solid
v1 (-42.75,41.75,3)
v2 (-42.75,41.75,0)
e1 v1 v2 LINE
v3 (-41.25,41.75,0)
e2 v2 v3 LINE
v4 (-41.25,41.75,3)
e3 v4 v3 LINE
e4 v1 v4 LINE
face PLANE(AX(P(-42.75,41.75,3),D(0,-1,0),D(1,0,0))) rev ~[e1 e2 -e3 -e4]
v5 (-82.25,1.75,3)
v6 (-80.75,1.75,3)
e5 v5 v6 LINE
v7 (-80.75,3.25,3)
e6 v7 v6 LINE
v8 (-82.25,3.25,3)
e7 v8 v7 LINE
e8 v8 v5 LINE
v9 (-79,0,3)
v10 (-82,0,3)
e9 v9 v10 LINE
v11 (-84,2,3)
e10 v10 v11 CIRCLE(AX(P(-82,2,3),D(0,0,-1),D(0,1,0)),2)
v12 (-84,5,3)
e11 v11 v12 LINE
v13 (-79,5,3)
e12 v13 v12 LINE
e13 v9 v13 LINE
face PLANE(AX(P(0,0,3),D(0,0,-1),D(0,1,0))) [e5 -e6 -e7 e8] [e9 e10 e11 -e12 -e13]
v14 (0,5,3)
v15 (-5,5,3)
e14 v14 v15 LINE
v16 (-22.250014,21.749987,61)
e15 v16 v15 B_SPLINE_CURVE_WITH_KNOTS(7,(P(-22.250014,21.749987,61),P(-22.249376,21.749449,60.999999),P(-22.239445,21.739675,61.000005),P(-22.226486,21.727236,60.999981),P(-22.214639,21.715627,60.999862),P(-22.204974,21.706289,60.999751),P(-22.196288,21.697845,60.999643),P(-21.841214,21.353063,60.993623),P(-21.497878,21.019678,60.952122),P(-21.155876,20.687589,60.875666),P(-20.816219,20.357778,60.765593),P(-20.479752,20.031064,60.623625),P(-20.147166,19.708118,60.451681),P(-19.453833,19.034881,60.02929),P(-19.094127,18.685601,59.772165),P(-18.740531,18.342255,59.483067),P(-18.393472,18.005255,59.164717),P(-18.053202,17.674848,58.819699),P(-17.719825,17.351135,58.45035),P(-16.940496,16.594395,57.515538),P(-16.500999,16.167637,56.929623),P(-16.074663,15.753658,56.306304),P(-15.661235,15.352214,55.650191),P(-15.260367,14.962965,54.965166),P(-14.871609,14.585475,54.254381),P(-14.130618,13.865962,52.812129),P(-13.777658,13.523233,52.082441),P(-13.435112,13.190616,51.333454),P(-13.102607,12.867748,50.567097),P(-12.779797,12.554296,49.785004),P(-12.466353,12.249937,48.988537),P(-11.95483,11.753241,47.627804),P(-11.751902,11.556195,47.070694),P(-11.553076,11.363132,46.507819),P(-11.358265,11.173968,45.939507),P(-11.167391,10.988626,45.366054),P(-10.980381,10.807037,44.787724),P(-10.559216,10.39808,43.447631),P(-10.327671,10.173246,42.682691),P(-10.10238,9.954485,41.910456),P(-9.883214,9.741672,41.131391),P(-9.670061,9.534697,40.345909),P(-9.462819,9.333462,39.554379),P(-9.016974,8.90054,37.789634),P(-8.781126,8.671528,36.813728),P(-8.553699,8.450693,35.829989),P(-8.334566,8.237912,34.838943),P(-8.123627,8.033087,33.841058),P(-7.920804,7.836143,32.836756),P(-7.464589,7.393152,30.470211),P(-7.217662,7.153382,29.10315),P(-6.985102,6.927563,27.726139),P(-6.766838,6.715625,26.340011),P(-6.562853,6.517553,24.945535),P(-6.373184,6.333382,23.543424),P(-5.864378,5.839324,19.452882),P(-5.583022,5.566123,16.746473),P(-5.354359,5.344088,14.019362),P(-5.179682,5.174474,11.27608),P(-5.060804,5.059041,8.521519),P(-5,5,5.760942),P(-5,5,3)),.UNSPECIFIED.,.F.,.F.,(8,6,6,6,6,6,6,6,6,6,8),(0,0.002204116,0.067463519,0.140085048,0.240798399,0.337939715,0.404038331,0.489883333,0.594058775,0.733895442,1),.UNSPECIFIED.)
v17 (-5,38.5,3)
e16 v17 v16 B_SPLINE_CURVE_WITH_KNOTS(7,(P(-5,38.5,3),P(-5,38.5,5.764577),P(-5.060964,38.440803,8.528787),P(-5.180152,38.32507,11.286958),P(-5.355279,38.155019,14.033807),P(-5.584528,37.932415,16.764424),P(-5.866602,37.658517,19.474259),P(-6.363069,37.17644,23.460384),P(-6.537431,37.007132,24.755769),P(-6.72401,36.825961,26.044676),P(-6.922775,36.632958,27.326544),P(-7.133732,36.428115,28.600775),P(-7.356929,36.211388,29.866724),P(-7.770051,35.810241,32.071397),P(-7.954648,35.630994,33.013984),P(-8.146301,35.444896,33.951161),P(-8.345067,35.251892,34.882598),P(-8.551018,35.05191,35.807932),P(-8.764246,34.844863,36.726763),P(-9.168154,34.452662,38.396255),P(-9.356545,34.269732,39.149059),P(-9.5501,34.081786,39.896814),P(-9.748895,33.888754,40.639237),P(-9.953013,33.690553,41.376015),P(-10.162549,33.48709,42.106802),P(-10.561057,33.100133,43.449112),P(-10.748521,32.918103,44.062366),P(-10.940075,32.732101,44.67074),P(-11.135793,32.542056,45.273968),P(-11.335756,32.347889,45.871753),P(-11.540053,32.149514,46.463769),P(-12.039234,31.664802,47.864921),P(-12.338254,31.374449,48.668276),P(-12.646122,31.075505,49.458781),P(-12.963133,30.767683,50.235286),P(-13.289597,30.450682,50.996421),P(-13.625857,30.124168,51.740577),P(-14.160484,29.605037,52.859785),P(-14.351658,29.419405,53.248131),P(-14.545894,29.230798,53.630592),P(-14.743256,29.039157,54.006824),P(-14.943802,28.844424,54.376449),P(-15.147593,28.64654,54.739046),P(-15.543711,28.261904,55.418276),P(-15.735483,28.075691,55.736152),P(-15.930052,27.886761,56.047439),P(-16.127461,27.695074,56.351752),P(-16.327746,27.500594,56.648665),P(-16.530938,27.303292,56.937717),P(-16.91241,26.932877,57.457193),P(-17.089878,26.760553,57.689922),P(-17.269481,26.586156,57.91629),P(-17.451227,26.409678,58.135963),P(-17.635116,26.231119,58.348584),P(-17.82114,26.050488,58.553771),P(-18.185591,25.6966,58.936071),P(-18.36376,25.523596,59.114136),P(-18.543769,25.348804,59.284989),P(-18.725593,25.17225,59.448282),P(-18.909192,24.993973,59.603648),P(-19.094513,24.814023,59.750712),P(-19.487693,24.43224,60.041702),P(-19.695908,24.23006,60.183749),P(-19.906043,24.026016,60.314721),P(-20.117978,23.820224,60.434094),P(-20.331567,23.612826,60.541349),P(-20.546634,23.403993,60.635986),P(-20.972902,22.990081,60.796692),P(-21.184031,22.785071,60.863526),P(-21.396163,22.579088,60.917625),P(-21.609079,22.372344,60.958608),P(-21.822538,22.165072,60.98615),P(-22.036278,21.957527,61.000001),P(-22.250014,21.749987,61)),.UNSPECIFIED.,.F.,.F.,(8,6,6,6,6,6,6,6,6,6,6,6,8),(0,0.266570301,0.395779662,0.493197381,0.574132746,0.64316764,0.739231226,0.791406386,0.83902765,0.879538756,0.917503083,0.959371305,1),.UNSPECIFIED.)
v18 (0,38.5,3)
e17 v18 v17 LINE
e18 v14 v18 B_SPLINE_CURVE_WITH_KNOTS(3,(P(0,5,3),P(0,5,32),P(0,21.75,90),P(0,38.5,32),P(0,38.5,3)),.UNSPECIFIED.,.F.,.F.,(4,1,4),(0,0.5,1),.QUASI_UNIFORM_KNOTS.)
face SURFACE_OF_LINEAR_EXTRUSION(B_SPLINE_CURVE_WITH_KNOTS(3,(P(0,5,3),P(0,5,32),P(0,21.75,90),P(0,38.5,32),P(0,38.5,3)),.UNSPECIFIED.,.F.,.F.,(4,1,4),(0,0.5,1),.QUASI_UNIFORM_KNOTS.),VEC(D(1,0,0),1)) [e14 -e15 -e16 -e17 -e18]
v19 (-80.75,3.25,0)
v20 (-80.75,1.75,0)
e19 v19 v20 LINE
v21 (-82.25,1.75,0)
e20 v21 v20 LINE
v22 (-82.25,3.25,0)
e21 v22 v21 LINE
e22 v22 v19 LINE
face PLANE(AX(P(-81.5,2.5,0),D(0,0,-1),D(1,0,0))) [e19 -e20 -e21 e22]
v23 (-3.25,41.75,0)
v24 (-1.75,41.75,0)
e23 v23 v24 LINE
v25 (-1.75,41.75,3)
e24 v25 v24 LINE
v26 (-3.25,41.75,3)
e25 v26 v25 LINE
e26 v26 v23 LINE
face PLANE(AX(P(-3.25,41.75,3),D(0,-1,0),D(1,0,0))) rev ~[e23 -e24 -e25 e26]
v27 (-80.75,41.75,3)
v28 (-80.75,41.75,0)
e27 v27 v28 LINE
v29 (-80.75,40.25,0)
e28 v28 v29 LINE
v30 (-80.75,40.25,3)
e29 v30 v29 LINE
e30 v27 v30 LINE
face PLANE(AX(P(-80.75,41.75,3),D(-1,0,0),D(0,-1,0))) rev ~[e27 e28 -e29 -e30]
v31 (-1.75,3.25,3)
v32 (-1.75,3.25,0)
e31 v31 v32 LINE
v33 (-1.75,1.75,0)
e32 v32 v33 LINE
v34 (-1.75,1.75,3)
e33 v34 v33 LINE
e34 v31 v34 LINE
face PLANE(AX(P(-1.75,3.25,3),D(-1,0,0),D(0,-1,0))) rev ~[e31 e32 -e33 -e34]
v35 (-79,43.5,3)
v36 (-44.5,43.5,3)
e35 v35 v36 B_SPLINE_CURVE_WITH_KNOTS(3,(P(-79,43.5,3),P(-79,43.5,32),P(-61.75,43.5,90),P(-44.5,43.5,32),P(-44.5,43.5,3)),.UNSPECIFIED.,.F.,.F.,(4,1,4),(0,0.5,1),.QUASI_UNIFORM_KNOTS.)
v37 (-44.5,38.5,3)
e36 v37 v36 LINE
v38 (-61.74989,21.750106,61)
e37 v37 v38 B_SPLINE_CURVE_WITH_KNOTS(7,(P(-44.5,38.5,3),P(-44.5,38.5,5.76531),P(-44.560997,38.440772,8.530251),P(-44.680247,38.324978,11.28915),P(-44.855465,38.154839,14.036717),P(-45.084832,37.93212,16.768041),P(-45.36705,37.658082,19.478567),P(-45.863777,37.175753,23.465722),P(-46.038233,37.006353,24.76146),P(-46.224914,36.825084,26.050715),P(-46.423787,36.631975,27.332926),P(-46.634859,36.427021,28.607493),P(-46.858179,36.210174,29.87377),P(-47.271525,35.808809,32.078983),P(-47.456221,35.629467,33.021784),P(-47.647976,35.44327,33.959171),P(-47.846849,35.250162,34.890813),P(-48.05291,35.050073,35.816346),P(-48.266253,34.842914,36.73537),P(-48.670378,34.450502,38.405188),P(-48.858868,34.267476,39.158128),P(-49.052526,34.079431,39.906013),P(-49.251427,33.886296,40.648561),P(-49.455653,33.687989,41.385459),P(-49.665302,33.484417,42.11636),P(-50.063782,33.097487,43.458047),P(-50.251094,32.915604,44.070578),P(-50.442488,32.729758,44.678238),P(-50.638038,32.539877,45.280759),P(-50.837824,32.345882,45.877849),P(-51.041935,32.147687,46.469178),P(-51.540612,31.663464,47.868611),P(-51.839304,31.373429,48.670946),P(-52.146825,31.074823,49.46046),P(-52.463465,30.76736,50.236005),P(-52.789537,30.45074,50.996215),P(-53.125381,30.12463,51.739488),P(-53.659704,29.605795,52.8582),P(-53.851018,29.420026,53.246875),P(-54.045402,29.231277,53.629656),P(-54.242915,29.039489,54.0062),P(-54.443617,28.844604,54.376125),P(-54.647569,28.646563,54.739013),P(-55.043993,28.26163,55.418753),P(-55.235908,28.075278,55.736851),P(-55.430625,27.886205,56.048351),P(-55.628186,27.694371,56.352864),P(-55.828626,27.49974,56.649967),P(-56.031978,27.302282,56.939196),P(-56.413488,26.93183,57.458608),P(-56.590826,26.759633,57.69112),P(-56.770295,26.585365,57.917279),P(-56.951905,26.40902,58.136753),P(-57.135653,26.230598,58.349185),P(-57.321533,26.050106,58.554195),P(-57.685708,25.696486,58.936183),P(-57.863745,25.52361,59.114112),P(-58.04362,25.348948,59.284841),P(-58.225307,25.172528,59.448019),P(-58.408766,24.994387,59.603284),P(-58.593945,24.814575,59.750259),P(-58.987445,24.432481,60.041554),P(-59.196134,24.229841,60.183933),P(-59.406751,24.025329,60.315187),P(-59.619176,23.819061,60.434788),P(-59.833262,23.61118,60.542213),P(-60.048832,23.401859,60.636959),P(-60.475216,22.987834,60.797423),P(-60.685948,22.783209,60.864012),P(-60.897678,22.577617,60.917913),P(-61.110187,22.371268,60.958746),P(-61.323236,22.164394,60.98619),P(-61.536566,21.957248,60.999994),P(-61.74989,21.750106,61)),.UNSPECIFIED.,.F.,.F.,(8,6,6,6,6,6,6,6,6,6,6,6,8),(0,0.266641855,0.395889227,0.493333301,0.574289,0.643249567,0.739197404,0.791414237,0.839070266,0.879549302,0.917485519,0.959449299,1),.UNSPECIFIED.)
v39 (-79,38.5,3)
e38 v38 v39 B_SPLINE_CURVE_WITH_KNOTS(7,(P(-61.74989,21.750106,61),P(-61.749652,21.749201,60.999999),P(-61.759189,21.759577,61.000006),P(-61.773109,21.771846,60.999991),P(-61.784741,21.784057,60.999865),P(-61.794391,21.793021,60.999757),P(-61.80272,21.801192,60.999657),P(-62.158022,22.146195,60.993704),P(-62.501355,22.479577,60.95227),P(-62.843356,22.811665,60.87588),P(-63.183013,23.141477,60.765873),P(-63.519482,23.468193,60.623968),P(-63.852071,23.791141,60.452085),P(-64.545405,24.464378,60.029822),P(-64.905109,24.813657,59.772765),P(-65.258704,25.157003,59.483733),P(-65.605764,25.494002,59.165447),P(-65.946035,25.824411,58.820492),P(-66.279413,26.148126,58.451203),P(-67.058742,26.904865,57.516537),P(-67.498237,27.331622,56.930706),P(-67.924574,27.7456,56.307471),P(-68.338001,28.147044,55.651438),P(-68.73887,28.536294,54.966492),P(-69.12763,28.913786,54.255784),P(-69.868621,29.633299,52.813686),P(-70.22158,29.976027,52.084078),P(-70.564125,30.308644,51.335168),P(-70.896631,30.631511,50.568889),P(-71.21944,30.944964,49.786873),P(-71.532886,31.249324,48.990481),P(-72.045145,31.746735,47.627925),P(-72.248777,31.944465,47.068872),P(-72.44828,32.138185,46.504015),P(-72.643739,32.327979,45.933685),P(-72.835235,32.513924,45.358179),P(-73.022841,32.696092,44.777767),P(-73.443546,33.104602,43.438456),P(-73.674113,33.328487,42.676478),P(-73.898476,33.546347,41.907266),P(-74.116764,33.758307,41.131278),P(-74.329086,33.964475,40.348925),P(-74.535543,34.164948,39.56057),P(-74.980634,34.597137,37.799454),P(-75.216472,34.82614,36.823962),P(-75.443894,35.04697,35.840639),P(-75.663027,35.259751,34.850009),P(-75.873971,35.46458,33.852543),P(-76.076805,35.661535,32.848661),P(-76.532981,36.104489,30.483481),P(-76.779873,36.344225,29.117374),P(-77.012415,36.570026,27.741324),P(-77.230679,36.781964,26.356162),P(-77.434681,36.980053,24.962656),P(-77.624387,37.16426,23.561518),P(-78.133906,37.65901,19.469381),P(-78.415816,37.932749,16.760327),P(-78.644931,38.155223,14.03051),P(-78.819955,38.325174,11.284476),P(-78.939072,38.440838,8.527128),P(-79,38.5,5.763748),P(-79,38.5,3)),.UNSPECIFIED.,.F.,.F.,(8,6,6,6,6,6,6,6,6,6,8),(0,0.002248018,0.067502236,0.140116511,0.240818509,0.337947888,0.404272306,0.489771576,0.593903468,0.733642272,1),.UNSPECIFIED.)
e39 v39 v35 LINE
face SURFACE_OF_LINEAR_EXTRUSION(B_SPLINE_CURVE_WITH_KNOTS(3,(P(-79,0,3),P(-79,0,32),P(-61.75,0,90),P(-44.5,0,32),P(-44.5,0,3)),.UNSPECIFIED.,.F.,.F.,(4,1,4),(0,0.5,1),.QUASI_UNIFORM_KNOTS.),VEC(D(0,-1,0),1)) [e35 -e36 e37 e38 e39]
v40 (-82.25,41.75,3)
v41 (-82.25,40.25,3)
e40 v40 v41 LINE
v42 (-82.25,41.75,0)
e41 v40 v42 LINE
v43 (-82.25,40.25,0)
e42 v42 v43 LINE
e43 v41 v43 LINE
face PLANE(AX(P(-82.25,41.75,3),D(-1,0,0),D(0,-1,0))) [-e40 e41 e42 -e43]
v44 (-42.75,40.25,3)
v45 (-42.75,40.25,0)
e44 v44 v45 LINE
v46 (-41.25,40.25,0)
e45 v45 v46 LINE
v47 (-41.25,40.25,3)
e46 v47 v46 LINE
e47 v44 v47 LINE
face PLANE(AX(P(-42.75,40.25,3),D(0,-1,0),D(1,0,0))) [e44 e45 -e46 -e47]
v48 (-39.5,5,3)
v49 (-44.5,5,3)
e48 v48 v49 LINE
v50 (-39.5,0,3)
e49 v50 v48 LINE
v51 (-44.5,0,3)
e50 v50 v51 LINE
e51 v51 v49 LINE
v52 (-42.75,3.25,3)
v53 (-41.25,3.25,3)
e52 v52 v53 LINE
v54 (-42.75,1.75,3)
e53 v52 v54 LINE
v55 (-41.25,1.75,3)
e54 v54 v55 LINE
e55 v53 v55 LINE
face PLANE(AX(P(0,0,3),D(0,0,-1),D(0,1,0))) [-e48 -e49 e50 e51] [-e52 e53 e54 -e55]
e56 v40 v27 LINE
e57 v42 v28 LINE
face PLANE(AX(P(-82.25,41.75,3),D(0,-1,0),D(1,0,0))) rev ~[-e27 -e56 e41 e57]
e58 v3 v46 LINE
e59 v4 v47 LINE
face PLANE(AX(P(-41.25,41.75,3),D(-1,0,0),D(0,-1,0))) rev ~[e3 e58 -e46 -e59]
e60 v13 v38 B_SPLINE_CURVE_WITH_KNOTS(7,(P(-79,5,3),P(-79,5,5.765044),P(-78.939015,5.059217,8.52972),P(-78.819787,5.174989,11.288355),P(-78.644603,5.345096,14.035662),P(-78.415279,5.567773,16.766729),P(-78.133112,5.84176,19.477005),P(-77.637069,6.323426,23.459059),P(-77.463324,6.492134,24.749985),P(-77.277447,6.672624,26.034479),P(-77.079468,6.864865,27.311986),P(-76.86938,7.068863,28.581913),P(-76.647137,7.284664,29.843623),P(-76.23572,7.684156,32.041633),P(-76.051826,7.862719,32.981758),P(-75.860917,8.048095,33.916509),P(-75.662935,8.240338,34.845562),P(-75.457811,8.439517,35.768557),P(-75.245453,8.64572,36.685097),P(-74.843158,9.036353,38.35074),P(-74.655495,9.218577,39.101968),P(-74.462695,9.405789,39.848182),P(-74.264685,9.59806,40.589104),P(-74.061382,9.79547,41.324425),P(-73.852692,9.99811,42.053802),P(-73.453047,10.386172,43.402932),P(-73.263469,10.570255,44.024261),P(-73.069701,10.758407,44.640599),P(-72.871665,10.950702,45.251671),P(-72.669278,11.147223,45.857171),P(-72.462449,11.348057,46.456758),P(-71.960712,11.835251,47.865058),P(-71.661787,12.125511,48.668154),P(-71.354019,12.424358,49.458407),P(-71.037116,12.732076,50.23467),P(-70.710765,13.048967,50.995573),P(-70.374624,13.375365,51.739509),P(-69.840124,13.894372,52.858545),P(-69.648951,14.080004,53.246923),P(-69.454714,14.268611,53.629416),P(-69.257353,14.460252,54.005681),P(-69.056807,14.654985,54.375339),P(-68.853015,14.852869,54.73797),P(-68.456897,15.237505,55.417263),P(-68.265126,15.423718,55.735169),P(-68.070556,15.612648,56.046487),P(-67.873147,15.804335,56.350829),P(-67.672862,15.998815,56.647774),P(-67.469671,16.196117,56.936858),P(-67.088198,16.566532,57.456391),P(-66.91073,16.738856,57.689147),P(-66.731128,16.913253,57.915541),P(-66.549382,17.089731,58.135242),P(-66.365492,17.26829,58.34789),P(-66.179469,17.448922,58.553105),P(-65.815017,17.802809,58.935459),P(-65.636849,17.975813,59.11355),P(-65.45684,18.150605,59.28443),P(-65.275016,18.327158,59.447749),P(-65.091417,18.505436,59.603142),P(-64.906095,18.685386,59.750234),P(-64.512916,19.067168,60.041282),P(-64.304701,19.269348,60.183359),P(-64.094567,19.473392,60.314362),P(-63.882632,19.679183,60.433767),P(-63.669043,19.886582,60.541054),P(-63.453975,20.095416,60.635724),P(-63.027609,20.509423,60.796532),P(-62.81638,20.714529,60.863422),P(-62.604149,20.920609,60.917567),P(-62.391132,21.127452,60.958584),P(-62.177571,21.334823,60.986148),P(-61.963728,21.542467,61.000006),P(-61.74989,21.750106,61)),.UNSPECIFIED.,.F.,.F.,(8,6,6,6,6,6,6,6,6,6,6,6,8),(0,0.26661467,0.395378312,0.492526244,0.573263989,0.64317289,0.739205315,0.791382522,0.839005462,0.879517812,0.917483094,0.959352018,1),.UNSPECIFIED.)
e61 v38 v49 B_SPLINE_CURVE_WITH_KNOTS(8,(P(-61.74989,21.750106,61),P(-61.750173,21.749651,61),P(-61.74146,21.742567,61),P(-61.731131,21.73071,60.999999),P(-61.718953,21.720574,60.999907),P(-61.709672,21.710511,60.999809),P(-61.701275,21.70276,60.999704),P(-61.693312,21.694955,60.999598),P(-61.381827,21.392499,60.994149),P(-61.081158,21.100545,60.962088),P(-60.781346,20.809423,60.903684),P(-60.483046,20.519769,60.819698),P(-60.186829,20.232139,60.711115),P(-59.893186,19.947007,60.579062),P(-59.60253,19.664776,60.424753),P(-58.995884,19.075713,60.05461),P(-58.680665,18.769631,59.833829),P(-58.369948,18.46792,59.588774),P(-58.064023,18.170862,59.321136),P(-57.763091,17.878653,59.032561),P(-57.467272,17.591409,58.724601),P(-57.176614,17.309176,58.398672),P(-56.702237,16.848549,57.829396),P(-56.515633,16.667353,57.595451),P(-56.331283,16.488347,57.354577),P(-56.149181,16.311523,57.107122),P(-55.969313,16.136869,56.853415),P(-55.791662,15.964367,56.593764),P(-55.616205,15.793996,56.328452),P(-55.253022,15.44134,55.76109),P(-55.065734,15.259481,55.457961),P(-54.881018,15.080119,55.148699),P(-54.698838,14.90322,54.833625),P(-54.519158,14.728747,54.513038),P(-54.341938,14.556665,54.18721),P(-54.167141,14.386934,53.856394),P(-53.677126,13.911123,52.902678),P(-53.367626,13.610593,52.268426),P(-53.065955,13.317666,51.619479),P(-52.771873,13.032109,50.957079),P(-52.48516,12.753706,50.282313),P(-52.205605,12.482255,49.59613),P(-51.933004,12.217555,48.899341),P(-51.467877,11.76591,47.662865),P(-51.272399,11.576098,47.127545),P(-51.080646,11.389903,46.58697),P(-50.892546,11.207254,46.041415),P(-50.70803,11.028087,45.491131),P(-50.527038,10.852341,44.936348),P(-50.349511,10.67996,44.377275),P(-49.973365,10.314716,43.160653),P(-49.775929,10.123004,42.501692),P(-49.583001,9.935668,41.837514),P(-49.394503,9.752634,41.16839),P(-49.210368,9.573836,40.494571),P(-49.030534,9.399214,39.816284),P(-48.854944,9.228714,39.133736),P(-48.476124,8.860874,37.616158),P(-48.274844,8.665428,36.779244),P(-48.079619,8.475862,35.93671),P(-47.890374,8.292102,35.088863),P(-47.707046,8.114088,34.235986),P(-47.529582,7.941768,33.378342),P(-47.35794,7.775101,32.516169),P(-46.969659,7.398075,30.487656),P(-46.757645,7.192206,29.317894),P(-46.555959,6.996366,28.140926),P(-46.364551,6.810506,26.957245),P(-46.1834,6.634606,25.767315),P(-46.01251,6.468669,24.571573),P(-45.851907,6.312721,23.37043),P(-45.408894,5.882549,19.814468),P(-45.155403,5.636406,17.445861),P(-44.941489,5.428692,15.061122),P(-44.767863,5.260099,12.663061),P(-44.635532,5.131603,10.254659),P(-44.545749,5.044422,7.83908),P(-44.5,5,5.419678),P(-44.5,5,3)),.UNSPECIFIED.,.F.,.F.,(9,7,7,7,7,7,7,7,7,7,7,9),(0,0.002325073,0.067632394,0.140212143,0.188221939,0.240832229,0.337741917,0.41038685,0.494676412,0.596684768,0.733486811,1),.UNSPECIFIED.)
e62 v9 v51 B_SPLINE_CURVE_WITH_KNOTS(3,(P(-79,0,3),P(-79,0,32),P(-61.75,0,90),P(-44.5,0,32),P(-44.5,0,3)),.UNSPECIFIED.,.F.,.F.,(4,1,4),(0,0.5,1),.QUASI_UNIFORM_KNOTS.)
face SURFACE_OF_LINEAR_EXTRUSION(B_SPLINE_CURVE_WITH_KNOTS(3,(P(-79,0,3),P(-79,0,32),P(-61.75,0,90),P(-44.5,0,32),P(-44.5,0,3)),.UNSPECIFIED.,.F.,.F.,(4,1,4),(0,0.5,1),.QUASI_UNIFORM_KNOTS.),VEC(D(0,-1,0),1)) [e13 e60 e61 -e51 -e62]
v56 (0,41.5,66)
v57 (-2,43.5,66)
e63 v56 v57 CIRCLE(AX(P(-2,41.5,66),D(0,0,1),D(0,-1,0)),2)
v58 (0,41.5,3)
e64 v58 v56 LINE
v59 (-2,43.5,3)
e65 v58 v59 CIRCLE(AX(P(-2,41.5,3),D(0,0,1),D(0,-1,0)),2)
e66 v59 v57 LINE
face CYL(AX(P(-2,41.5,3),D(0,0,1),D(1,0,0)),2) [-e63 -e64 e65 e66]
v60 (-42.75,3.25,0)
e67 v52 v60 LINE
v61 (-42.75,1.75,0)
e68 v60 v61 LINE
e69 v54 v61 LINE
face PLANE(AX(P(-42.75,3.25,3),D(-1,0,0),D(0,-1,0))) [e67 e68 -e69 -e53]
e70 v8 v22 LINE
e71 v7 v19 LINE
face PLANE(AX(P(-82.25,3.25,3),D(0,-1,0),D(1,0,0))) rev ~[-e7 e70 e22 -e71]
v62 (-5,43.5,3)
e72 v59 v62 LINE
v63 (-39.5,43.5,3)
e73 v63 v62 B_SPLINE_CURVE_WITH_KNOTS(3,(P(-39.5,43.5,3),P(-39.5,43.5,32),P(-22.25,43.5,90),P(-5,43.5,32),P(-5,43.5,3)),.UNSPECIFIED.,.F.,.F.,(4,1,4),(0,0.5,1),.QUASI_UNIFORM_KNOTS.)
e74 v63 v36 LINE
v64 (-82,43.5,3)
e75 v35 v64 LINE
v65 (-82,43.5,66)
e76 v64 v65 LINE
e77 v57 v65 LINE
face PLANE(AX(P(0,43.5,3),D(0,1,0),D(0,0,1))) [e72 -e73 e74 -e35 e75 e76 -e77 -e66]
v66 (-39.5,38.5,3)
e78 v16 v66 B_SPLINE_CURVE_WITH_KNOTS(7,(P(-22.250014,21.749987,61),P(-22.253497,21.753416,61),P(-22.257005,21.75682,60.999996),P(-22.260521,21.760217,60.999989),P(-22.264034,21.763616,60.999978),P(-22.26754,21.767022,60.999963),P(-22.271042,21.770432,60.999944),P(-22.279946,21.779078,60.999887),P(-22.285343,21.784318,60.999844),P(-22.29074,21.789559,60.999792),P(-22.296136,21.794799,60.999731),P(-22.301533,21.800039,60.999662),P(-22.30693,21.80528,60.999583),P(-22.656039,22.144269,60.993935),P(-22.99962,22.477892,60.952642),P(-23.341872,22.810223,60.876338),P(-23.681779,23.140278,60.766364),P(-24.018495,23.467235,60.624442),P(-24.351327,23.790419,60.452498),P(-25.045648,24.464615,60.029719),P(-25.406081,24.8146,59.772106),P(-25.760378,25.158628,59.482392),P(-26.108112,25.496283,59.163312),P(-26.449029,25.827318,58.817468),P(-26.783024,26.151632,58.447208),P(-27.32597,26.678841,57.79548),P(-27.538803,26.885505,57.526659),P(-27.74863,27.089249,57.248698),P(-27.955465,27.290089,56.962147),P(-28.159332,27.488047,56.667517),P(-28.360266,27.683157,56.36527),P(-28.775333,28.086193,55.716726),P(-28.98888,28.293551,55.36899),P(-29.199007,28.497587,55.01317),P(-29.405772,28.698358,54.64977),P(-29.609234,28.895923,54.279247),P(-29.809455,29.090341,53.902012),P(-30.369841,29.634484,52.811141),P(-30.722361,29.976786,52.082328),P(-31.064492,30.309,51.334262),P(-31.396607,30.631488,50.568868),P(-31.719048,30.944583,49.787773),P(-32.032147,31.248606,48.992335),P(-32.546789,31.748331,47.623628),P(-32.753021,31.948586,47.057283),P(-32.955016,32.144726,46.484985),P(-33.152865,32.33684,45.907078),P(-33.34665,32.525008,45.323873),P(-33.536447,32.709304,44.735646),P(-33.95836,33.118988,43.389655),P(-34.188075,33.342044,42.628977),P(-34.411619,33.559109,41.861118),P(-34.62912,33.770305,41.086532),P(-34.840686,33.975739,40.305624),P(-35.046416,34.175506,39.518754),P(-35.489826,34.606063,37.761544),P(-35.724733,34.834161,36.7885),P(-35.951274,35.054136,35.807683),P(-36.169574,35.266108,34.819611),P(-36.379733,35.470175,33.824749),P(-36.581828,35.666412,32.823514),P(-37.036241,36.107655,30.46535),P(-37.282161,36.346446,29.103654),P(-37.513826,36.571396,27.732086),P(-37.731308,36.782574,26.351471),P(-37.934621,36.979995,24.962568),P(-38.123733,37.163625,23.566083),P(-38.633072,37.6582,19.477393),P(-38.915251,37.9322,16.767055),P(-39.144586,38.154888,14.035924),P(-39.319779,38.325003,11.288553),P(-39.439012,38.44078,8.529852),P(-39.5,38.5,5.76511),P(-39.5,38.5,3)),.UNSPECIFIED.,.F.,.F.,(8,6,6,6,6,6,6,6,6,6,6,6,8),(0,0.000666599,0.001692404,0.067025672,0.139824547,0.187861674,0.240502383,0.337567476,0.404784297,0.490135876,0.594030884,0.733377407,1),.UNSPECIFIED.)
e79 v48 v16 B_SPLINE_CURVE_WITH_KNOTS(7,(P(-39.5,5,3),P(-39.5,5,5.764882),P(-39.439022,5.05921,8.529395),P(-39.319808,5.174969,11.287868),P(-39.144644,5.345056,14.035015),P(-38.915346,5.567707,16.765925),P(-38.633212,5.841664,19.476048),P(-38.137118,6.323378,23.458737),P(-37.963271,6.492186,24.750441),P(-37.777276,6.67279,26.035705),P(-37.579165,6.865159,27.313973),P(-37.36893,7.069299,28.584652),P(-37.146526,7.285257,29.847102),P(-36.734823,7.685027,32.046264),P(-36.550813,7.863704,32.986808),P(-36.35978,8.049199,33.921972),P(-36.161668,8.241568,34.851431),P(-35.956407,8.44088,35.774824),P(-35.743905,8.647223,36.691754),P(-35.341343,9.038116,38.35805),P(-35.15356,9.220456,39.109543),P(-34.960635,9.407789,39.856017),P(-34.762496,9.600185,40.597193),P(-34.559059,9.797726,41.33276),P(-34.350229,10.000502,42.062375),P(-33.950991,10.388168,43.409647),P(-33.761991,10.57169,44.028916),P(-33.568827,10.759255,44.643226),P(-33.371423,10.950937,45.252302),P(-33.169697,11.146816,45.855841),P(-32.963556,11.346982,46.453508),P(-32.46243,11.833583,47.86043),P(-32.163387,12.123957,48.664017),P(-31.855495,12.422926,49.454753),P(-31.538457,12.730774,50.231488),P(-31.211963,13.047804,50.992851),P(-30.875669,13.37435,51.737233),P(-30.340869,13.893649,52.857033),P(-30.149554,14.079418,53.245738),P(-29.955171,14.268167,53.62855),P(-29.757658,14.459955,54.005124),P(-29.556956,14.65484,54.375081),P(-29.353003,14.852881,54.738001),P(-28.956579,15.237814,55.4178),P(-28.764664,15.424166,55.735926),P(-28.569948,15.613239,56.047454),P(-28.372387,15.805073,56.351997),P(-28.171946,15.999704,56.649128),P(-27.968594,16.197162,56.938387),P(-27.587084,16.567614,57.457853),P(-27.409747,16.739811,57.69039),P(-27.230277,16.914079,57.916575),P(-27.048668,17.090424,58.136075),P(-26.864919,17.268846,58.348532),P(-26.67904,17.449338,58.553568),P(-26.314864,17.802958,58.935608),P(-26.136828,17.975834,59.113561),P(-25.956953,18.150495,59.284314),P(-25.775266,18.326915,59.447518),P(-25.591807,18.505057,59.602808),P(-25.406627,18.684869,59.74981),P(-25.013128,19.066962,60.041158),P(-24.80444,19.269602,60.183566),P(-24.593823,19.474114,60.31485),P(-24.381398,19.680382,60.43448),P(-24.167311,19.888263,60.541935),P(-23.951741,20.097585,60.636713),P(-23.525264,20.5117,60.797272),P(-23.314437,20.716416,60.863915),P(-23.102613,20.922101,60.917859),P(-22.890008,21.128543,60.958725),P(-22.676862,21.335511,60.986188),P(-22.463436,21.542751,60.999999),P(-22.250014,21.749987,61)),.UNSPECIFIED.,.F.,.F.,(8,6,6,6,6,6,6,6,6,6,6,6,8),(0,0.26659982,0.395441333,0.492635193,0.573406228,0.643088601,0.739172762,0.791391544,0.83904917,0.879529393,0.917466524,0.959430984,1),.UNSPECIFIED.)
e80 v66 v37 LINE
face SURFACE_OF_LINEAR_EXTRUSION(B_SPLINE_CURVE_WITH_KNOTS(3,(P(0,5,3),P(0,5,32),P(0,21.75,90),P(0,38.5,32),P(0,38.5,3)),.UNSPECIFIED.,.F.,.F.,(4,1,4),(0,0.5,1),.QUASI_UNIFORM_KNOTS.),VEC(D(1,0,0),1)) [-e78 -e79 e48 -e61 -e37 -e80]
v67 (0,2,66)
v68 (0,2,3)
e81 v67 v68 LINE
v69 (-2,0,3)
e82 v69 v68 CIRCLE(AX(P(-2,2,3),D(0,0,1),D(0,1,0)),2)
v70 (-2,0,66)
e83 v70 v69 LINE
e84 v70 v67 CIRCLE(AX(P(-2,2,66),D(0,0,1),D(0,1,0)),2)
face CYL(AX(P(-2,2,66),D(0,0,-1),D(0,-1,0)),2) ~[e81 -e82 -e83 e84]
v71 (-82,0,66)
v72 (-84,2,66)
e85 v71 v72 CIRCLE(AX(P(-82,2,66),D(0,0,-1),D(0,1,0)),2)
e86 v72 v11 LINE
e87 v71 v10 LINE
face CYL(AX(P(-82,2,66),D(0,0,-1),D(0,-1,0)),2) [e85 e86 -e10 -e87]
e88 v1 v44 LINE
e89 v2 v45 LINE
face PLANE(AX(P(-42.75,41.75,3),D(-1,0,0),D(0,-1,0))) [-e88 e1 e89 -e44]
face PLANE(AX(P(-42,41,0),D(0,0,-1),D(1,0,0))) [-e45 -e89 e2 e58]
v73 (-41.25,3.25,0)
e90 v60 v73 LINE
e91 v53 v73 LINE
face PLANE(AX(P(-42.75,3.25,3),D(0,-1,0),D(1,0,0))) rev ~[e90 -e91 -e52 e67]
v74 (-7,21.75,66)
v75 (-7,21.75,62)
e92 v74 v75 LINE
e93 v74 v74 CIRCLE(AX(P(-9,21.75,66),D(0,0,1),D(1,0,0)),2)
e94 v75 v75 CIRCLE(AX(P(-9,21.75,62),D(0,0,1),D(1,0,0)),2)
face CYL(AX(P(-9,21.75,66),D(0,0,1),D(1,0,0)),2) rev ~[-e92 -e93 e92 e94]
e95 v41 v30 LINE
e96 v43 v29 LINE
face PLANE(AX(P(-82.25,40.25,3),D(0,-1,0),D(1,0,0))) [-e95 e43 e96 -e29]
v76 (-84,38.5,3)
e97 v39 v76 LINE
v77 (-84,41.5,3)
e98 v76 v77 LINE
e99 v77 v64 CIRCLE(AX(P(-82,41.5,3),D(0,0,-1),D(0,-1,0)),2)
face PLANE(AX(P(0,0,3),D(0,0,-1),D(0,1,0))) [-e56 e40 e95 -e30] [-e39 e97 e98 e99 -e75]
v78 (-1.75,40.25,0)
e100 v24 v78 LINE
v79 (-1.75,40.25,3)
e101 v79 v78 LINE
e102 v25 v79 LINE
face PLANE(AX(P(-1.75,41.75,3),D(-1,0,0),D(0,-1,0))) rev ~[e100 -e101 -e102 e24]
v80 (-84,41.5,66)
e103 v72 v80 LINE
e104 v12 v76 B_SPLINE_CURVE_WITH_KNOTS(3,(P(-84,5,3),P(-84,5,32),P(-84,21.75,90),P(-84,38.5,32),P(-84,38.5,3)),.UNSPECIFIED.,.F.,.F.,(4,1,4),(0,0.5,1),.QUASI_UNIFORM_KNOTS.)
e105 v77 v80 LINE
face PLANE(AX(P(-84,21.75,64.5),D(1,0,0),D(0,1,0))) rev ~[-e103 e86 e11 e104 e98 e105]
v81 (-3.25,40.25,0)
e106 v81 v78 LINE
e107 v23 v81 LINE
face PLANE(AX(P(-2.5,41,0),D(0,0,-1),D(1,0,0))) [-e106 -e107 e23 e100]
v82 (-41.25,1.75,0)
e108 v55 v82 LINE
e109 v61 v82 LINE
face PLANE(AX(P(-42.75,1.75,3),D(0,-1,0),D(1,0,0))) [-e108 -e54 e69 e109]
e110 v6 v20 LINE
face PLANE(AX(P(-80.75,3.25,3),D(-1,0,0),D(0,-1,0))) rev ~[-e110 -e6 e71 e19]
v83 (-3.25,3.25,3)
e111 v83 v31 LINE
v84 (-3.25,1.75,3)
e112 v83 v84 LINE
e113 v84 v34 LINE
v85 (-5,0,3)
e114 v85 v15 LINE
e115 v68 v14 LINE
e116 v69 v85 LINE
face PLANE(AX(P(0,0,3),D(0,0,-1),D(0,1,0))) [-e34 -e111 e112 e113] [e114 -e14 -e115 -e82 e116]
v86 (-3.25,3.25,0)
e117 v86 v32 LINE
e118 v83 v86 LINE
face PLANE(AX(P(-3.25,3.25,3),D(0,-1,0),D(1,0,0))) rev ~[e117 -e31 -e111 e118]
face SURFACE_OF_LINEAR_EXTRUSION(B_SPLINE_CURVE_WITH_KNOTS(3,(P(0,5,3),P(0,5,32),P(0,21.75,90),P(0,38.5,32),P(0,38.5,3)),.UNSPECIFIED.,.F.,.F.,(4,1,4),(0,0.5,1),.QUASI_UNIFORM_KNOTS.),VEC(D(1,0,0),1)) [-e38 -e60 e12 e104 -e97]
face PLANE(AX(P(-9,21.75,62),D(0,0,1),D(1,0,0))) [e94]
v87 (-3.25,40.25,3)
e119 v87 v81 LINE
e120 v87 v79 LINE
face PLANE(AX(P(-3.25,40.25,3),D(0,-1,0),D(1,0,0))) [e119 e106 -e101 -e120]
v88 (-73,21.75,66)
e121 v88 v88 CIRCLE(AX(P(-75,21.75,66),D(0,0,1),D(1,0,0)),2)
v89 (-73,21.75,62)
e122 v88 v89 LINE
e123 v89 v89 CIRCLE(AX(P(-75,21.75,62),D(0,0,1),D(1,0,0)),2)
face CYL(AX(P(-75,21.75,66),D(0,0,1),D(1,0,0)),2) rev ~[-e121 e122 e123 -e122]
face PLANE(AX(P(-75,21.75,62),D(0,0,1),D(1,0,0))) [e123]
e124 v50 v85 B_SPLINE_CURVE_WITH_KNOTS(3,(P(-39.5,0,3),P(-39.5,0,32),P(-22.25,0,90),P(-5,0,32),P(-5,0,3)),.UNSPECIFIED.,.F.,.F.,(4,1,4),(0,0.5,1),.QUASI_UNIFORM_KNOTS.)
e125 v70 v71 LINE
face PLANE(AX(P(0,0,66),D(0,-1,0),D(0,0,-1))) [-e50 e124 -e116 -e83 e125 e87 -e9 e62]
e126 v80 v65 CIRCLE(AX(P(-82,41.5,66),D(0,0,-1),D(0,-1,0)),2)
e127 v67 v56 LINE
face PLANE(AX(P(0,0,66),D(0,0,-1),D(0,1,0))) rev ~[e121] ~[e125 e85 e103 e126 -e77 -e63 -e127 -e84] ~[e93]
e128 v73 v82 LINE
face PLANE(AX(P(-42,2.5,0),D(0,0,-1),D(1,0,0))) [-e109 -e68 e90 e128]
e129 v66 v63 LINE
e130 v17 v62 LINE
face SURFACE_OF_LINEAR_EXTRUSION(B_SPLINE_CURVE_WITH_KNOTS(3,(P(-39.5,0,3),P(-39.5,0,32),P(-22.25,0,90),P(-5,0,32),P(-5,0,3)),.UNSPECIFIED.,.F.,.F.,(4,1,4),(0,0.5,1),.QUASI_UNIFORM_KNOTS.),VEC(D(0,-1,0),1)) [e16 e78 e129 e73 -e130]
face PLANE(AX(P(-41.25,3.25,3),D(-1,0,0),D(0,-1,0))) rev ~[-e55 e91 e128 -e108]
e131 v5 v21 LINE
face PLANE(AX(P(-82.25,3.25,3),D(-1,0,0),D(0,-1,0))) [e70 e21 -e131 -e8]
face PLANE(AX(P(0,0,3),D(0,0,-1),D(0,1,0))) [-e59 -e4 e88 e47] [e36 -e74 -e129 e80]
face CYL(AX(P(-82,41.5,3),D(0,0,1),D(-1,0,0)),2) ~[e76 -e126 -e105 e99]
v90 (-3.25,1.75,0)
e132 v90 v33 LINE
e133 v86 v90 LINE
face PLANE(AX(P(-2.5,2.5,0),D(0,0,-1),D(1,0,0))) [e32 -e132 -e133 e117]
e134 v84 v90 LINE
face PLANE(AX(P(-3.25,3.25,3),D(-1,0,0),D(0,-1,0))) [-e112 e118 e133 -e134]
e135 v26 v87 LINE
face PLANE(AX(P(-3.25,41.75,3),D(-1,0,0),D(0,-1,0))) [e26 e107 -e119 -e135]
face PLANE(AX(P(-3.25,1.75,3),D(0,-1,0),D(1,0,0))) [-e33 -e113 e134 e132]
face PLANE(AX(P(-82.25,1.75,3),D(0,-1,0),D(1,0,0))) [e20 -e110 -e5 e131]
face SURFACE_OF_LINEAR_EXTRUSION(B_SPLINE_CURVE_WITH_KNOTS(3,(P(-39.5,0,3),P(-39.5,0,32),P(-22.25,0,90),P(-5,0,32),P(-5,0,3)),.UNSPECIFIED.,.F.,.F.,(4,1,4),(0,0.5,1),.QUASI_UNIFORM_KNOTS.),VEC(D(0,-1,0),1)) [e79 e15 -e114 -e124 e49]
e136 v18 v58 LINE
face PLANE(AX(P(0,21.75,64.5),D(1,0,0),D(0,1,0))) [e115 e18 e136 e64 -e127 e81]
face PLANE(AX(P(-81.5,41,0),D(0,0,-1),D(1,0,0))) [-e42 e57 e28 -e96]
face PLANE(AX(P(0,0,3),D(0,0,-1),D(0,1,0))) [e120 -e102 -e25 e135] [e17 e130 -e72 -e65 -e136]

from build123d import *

# Parameters (mm, degrees)
F0_W      = 43.5
F0_H      = 3
F1_DEPTH  = 84
F3_DEPTH  = 84
F5_DEPTH  = 43.5
F6_R      = 2
F7_R      = 2
F8_DEPTH  = 4
F9_W      = 1.5
F9_H      = 1.5
F10_DEPTH = 3


# Not quite as in the source:
# - a feature names something its author has since deleted; it is built from what else it names


with BuildPart() as f1:
    # F0 (on Right) → F1 (new body)
    with BuildSketch(Plane.YZ):
        with Locations((21.75, 64.5)):
            Rectangle(F0_W, F0_H)
        Polygon((0, 63), (0, 3), (21, 3), (43.5, 3), (43.5, 63), align=None)
    extrude(amount=-F1_DEPTH)

    # F2 (on Right) → F3 (cut, through all)
    with BuildSketch(Plane.YZ):
        with BuildLine():
            add(Edge.make_bspline(
                [(4.9999998882, 3), (4.9999998882, 32.0000000559), (21.75, 90.0000001676), (38.5000001118, 32.0000000559), (38.5000001118, 3)],
                knots=[0, 0, 0, 0, 0.5, 1, 1, 1, 1], degree=3))
            Line((4.9999998882, 3), (38.5000001118, 3))
        make_face()
    extrude(amount=-F3_DEPTH, mode=Mode.SUBTRACT)

    # F4 (on Front) → F5 (cut, through all)
    with BuildSketch(Plane.XZ):
        with BuildLine():
            add(Edge.make_bspline(
                [(-79.0000001118, 3), (-79.0000001118, 32.0000000559), (-61.7500000559, 90.0000001676), (-44.5, 32.0000000559), (-44.5, 3)],
                knots=[0, 0, 0, 0, 0.5, 1, 1, 1, 1], degree=3))
            Line((-79.0000001118, 3), (-44.5, 3))
        make_face()
        with BuildLine():
            add(Edge.make_bspline(
                [(-39.5, 3), (-39.5, 32.0000000559), (-22.2499999441, 90.0000001676), (-4.9999998882, 32.0000000559), (-4.9999998882, 3)],
                knots=[0, 0, 0, 0, 0.5, 1, 1, 1, 1], degree=3))
            Line((-39.5, 3), (-4.9999998882, 3))
        make_face()
    extrude(amount=-F5_DEPTH, mode=Mode.SUBTRACT)

    # F6
    f6_edges = [f1.edges().sort_by_distance(p)[0] for p in [
        (0, 0, 34.5),
        (-84, 0, 34.5),
        (0, 43.5, 34.5),
        (-84, 43.5, 34.5),
    ]]
    fillet(f6_edges, radius=F6_R)

    # F7 (on face) → F8 (cut)
    with BuildSketch(Plane.XY.offset(66)):
        with Locations((-75, 21.75)):
            Circle(F7_R)
        with Locations((-9, 21.75)):
            Circle(F7_R)
    extrude(amount=-F8_DEPTH, mode=Mode.SUBTRACT)

    # F9 (on face) → F10 (join)
    with BuildSketch(Plane(origin=(0, 0, 3), x_dir=(1, 0, 0), z_dir=(0, 0, -1))):
        with Locations((-42, -2.4999999446)):
            Rectangle(F9_W, F9_H)
        with Locations((-2.4999999441, -2.4999999444)):
            Rectangle(F9_W, F9_H)
        with Locations((-2.4999999443, -41.0000000559)):
            Rectangle(F9_W, F9_H)
        with Locations((-42, -41.0000000564)):
            Rectangle(F9_W, F9_H)
        with Locations((-81.5000000559, -41.0000000561)):
            Rectangle(F9_W, F9_H)
        with Locations((-81.5000000562, -2.4999999441)):
            Rectangle(F9_W, F9_H)
    extrude(amount=F10_DEPTH)


solid = f1.part
